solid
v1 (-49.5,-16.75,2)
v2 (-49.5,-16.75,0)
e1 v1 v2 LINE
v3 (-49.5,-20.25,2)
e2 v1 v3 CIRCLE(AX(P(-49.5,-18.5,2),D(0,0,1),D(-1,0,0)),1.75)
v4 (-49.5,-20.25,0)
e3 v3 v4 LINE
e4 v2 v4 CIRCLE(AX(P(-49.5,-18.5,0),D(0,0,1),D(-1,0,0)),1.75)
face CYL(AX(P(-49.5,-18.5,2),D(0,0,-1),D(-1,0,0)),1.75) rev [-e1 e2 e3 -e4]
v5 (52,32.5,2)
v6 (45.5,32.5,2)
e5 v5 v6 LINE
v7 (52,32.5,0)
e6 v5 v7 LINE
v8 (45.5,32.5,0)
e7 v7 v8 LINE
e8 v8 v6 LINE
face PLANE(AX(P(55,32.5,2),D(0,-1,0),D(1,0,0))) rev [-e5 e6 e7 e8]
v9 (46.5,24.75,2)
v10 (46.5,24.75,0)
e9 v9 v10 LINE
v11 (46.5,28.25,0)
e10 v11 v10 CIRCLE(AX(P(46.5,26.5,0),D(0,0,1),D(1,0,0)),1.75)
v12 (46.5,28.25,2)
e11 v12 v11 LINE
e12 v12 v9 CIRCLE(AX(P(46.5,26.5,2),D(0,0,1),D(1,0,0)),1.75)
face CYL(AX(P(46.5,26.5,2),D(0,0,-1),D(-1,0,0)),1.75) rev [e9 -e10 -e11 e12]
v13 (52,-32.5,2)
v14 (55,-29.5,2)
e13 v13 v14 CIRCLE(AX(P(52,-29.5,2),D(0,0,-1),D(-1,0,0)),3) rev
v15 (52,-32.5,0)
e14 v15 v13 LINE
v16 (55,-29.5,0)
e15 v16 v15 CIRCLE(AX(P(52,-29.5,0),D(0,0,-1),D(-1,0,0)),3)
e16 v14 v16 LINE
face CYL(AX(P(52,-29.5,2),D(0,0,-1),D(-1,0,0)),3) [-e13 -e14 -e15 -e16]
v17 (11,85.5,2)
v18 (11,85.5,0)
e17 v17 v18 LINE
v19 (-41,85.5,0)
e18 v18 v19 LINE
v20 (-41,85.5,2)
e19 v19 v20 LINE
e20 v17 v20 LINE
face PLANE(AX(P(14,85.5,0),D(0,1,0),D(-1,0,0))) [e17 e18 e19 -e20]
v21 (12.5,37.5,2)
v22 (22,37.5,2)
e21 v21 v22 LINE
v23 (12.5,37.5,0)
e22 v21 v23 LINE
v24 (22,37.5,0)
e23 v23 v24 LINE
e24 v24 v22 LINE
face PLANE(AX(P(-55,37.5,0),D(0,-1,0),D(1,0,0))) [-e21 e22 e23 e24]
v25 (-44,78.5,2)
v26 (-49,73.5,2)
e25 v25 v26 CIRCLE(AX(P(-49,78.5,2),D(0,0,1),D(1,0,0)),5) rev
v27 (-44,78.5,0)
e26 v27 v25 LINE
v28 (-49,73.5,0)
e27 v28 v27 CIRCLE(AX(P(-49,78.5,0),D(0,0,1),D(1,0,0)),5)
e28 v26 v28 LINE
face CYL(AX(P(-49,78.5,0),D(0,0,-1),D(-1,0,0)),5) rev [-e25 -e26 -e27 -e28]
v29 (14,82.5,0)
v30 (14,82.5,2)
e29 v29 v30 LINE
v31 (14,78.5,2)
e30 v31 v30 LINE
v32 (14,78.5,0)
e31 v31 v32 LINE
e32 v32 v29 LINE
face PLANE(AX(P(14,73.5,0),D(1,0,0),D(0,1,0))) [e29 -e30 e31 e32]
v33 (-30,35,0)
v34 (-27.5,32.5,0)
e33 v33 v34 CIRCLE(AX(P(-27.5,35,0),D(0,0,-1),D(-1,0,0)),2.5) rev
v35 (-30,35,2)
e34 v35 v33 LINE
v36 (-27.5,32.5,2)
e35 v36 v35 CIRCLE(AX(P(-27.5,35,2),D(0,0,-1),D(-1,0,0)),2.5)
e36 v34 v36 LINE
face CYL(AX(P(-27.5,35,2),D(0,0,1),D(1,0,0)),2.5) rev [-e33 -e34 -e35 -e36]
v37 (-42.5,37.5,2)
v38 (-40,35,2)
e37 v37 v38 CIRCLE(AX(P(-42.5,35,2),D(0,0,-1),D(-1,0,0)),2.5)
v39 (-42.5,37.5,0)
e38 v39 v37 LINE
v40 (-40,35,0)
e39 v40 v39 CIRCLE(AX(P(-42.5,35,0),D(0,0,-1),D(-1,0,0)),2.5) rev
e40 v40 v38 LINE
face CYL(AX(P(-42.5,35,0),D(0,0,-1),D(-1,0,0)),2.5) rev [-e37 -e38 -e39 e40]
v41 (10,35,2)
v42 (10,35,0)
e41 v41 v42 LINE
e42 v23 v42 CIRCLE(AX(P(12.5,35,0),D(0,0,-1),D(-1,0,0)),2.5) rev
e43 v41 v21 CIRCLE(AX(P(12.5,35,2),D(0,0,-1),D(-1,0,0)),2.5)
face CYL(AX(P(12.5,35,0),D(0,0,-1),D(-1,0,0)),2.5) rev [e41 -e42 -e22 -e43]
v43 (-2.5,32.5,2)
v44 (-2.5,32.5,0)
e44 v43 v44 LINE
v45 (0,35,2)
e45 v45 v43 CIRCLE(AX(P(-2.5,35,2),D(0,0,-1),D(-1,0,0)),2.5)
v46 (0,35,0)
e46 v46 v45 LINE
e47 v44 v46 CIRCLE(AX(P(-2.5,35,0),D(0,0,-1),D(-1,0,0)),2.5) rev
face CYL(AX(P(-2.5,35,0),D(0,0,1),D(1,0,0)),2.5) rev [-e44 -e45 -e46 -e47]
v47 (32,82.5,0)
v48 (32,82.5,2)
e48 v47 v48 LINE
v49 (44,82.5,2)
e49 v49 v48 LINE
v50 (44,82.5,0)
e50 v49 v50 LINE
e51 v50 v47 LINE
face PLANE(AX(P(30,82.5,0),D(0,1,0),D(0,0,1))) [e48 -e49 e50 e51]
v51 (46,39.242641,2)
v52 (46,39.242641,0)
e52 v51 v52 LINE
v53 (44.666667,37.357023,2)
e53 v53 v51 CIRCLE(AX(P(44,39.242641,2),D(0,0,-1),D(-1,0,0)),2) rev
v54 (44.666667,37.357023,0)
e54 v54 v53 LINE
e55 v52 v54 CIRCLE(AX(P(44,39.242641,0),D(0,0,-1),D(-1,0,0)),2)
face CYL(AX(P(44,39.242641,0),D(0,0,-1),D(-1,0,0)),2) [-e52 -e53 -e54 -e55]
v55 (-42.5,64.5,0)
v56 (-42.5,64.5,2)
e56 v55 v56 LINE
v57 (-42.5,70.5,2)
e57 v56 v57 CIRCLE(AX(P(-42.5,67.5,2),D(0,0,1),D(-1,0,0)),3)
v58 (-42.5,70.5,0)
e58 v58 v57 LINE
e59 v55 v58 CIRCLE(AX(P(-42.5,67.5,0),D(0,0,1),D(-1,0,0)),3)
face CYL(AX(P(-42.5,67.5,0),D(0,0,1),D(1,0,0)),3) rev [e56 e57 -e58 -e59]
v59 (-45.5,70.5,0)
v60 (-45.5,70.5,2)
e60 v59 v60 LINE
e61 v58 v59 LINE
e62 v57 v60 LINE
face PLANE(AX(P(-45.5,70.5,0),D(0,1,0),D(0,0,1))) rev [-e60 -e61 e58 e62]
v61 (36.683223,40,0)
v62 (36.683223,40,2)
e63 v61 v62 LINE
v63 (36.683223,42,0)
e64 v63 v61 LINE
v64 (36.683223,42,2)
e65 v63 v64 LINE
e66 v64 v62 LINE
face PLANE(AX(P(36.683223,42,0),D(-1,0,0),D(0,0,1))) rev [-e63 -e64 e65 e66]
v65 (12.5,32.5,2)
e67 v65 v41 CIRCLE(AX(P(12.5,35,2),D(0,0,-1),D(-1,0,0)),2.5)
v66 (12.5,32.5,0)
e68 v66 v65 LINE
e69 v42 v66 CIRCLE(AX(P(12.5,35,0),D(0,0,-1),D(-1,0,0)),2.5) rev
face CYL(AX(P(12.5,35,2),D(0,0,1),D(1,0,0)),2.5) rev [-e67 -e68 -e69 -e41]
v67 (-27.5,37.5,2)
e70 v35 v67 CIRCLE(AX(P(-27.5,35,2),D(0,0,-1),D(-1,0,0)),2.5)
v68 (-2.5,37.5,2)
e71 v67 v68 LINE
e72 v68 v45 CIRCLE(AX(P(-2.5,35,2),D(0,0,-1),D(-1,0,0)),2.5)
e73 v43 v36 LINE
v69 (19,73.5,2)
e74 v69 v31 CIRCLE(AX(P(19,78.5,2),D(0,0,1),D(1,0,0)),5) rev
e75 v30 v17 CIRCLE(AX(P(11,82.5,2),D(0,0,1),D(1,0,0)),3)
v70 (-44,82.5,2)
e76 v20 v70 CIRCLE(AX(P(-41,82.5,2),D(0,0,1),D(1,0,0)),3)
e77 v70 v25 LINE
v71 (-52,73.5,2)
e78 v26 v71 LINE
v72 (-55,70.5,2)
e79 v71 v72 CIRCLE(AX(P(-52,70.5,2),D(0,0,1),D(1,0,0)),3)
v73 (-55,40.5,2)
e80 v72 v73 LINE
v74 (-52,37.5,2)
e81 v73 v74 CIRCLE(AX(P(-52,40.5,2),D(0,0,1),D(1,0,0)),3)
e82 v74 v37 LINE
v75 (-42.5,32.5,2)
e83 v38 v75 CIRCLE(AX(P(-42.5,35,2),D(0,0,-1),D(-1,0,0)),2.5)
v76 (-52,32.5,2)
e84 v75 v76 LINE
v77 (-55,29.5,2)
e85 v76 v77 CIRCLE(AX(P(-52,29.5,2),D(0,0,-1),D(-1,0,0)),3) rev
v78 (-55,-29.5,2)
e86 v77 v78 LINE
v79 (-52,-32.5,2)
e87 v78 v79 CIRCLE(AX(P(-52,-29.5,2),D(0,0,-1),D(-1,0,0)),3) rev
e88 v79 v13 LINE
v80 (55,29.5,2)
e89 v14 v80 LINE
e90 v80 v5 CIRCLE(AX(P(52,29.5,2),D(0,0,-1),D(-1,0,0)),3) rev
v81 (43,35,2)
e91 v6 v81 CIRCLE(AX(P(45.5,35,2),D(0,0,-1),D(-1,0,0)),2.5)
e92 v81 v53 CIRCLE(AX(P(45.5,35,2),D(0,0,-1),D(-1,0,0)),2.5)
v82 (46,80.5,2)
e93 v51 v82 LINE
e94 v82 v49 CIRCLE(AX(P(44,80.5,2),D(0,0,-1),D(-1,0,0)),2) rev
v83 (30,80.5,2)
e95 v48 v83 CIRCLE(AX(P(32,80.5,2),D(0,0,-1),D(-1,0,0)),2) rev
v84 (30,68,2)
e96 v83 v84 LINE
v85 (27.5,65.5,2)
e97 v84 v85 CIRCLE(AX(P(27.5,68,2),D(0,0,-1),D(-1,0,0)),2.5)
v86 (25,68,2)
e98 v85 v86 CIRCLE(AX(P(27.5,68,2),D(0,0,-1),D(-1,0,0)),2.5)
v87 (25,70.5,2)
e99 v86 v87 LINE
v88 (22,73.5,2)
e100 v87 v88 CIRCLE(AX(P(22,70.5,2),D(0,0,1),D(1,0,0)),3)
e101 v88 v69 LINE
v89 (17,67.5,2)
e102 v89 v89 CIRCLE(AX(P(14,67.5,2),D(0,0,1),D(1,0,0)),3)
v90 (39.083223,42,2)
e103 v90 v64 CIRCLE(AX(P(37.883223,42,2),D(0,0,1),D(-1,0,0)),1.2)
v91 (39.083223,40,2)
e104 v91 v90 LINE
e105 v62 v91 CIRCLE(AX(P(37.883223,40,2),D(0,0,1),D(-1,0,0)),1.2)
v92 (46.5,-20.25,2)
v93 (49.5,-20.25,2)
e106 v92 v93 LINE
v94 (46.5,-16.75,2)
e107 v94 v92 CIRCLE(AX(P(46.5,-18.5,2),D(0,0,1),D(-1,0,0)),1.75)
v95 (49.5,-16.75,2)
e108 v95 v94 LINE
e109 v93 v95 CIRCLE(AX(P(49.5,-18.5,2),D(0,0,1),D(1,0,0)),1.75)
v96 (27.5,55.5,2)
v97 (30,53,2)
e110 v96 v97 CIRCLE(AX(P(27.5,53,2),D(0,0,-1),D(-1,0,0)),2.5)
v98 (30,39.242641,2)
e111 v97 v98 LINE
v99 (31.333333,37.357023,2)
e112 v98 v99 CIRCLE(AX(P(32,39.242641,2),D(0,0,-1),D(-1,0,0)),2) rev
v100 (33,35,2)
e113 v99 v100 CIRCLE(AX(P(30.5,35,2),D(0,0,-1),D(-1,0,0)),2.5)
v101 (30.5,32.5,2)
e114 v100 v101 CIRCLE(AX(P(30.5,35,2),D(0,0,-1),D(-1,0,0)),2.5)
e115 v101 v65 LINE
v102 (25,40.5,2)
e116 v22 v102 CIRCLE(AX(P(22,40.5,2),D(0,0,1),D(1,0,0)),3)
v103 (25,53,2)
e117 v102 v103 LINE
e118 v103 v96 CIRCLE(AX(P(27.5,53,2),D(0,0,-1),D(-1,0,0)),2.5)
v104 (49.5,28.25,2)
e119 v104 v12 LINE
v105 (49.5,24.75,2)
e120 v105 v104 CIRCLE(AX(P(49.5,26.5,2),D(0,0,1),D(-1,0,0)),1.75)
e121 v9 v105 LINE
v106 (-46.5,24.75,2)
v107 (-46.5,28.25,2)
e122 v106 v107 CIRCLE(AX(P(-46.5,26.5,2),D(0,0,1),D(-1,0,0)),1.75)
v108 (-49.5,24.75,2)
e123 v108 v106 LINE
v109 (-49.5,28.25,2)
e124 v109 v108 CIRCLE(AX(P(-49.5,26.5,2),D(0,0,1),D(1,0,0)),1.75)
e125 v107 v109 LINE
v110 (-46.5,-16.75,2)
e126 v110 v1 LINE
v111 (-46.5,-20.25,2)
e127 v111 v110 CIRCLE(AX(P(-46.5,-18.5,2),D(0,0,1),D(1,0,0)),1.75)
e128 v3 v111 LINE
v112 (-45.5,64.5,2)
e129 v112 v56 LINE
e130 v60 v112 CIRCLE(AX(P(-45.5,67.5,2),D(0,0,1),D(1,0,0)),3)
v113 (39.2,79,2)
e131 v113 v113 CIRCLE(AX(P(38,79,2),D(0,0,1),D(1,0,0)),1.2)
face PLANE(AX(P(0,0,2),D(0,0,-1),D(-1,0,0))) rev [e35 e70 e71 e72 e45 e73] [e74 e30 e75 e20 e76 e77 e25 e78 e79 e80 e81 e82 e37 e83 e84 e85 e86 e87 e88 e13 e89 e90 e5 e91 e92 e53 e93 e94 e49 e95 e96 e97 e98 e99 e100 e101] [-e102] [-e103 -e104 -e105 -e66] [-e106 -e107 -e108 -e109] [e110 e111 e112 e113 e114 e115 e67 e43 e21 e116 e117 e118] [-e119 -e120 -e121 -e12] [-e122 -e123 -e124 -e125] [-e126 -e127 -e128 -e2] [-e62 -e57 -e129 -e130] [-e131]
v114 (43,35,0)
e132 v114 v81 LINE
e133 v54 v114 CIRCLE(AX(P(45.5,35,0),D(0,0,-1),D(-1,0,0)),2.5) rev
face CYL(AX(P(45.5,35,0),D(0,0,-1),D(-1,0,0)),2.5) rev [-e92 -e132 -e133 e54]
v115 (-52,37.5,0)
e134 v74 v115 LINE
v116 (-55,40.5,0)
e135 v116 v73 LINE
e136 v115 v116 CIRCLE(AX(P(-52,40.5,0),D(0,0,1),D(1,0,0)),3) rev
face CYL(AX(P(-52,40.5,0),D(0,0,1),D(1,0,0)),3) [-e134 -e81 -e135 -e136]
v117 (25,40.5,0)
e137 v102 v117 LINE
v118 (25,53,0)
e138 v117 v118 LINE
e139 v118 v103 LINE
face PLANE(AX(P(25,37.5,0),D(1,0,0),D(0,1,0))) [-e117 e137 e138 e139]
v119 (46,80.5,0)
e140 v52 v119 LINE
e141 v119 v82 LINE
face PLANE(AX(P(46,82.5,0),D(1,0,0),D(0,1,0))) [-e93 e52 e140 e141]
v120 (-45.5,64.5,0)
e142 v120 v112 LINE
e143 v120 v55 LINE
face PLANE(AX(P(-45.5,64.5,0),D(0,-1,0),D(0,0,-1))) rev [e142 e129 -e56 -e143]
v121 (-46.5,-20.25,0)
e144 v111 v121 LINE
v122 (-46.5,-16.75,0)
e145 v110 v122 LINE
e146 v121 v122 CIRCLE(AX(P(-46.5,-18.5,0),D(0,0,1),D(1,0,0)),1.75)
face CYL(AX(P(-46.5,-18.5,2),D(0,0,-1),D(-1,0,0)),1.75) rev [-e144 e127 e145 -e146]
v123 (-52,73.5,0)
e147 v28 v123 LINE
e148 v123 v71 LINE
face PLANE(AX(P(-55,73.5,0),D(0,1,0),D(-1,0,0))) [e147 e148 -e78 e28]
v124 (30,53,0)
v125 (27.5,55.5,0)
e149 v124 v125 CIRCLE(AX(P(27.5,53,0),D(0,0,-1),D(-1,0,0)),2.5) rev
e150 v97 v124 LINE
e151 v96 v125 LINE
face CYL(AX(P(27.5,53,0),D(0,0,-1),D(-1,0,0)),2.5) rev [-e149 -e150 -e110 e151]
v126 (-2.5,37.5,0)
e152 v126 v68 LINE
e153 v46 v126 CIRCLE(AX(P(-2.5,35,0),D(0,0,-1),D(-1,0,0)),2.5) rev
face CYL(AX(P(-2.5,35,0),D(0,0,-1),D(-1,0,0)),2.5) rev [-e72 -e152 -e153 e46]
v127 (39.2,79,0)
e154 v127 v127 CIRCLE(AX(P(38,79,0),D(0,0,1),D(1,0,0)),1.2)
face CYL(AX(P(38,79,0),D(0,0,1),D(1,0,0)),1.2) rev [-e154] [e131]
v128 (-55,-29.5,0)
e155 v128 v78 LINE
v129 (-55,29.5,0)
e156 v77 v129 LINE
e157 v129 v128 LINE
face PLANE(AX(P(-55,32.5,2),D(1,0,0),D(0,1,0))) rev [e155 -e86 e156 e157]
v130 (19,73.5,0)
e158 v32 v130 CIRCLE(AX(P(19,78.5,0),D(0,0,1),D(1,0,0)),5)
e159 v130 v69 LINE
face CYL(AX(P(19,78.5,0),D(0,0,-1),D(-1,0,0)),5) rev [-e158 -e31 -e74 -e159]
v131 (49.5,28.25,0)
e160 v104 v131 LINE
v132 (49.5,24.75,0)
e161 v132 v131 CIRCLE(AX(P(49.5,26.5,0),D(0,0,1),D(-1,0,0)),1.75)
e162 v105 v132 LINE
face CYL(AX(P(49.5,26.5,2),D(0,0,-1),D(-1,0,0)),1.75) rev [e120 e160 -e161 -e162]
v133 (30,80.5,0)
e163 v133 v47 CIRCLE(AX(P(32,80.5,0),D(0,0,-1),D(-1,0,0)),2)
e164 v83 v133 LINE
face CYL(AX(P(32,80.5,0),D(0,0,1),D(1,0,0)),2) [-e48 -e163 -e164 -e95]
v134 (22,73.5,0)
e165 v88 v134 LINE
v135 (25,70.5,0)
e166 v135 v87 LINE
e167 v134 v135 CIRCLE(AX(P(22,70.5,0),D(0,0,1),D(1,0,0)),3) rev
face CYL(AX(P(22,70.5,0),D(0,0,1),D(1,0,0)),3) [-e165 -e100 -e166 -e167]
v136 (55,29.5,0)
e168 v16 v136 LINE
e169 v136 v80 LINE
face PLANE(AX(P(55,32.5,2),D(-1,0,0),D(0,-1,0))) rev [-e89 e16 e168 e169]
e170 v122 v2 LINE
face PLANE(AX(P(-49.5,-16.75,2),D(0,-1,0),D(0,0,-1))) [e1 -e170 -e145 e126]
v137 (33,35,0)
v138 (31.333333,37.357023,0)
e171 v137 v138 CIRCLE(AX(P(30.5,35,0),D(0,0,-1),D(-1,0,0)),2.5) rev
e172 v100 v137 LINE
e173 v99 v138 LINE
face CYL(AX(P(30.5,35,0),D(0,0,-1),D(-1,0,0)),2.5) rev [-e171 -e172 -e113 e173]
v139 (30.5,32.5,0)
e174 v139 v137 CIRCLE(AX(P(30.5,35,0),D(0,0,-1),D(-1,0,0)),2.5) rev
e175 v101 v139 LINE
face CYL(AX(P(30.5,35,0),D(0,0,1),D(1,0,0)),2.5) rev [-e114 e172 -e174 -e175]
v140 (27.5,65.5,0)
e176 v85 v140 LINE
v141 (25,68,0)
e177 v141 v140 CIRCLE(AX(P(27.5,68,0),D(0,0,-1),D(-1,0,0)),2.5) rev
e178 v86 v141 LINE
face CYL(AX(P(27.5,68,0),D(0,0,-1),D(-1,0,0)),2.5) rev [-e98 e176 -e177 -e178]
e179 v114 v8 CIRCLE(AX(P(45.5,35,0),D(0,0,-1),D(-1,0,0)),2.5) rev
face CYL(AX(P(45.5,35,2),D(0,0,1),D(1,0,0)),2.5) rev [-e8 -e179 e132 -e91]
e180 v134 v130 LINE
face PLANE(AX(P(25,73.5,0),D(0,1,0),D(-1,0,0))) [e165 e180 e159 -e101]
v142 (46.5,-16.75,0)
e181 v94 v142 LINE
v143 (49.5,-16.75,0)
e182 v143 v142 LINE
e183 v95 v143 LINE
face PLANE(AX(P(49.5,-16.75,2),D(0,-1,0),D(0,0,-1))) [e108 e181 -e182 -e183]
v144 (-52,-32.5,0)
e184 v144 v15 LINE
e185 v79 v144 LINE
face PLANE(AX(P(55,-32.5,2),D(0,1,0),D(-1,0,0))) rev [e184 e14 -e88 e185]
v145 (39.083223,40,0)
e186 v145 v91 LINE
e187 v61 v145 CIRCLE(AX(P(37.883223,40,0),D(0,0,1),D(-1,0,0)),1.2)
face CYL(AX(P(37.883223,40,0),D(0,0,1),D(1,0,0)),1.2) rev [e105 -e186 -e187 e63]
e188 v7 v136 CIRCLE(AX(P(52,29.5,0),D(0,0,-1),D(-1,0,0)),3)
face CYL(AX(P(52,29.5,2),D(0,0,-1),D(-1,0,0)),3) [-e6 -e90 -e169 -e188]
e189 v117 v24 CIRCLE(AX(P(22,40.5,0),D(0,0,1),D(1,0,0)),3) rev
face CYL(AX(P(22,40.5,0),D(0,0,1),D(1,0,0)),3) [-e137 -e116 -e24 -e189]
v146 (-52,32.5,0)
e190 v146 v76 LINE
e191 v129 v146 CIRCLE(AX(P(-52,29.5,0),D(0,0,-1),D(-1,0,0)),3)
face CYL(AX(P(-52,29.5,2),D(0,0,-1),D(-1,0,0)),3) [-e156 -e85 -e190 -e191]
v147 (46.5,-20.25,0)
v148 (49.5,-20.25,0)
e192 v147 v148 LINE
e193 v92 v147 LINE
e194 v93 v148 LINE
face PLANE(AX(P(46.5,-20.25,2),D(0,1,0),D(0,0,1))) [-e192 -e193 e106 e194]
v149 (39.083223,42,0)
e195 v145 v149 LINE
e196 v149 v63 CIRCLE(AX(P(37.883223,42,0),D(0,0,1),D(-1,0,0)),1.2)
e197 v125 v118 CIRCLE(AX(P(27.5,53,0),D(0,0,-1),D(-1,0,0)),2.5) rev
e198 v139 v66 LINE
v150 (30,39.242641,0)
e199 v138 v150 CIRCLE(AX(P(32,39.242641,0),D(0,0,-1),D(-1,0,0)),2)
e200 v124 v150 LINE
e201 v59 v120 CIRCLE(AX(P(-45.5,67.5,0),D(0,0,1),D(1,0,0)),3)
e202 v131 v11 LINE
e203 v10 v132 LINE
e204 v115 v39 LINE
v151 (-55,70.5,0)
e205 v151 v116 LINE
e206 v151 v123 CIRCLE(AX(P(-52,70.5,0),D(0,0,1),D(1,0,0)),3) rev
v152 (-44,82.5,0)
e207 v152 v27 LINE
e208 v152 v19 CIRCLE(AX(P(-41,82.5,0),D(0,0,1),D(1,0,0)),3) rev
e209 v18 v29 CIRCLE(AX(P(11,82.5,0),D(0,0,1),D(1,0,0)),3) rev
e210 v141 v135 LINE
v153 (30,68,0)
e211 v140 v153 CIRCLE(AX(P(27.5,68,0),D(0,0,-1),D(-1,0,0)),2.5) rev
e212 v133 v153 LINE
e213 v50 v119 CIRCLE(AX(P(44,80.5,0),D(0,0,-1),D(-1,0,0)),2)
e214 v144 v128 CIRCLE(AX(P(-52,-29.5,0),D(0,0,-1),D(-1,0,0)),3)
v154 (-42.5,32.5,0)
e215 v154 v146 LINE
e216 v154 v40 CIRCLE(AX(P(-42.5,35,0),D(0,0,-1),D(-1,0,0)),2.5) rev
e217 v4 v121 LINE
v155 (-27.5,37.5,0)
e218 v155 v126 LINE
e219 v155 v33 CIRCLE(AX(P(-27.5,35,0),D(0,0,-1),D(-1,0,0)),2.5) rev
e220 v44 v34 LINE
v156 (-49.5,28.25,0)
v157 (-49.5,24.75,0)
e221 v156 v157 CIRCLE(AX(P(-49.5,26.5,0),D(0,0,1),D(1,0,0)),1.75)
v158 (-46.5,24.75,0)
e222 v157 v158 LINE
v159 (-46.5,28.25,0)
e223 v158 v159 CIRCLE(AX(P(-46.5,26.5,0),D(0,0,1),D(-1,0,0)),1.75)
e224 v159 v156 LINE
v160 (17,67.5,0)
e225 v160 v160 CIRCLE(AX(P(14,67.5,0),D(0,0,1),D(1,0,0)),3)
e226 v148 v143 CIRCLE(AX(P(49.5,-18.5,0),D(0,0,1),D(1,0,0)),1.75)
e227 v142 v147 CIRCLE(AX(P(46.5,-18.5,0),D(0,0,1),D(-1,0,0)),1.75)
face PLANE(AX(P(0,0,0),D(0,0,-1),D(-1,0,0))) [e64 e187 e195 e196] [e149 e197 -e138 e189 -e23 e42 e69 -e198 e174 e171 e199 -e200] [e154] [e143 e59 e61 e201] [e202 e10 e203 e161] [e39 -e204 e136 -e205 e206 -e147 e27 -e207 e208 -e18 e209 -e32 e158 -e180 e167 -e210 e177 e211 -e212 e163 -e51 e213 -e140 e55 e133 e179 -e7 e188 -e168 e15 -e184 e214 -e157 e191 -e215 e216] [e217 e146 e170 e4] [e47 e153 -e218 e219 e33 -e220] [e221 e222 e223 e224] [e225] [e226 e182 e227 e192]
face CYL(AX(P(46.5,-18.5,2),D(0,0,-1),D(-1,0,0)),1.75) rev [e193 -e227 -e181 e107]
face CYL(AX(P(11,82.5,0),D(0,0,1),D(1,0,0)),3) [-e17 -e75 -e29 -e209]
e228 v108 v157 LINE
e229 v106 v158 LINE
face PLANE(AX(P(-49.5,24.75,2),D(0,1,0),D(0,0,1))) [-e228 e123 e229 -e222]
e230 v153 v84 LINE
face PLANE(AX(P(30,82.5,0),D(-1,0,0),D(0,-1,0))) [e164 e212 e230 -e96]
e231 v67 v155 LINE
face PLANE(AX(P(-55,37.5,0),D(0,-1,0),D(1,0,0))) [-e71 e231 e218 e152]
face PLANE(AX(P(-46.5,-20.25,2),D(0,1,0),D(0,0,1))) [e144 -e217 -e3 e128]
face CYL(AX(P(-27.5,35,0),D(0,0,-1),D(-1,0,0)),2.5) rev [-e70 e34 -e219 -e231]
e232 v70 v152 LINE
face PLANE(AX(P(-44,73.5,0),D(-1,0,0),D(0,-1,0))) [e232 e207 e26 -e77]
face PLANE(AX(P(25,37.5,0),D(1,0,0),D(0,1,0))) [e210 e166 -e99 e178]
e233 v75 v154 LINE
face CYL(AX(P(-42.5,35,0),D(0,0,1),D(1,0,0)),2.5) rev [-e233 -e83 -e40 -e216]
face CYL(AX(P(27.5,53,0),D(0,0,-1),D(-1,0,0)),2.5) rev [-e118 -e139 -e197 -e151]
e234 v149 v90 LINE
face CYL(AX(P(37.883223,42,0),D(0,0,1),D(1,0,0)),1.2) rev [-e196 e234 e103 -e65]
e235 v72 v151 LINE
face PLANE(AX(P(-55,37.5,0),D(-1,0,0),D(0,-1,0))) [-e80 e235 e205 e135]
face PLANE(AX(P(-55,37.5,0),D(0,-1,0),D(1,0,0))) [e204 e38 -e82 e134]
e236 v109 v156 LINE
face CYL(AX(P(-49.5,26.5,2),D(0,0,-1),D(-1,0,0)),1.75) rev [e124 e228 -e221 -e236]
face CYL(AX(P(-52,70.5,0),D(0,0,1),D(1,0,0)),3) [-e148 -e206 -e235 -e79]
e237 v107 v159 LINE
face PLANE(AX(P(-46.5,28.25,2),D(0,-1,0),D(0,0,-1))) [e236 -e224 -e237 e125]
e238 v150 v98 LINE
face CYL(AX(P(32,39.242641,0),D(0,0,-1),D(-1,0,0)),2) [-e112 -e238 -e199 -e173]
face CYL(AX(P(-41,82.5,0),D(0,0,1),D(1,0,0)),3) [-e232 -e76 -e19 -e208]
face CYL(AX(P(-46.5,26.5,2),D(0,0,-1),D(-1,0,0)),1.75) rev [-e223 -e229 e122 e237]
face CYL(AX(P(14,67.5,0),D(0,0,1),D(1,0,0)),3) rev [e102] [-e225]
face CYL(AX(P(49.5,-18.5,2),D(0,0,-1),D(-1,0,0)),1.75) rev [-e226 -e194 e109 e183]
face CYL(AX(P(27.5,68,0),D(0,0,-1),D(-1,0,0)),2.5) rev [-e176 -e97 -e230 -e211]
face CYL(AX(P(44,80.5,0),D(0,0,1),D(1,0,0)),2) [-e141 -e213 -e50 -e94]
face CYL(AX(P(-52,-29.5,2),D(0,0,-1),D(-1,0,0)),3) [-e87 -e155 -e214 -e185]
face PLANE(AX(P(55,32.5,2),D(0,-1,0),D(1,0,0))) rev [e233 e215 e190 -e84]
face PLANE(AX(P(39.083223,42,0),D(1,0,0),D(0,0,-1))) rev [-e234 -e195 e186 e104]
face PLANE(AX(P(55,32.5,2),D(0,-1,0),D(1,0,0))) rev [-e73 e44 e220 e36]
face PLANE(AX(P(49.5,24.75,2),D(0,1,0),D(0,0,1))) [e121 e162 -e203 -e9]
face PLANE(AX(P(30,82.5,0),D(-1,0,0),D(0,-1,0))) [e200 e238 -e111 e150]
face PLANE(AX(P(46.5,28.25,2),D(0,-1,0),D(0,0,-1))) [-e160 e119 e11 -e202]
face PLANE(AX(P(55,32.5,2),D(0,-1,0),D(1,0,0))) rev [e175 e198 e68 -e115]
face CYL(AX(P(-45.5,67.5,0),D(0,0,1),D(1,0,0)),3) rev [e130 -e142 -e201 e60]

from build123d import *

# Parameters (mm, degrees)
SKETCH_1_W      = 110
SKETCH_1_H      = 65
EXTRUDE_1_DEPTH = 2
FILLET_1_R      = 3
SKETCH_2_R      = 3
EXTRUDE_2_DEPTH = 2
FILLET_5_R      = 3
FILLET_6_R      = 5
SKETCH_4_W      = 10
SKETCH_4_H      = 5
EXTRUDE_4_DEPTH = 2
FILLET_7_R      = 2.5
SKETCH_5_W      = 16
SKETCH_5_H      = 45
SKETCH_5_R      = 1.2
EXTRUDE_5_DEPTH = 2
SKETCH_6_W      = 10
SKETCH_6_H      = 5
SKETCH_6_W_2    = 5
SKETCH_6_H_2    = 10
EXTRUDE_6_DEPTH = 2
FILLET_8_R      = 2.5
FILLET_9_R      = 2


with BuildPart() as part:
    # ｽｹｯﾁ1 → ﾎﾞｽ - 押し出し1 (new body)
    with BuildSketch(Plane.XY):
        Rectangle(SKETCH_1_W, SKETCH_1_H)
        with BuildLine():
            Line((-49.5, 24.75), (-46.5, 24.75))
            ThreePointArc((-46.5, 24.75), (-44.75, 26.5), (-46.5, 28.25))
            Line((-46.5, 28.25), (-49.5, 28.25))
            ThreePointArc((-49.5, 28.25), (-51.25, 26.5), (-49.5, 24.75))
        make_face(mode=Mode.SUBTRACT)
        with BuildLine():
            Line((-46.5, -20.25), (-49.5, -20.25))
            ThreePointArc((-49.5, -20.25), (-51.25, -18.5), (-49.5, -16.75))
            Line((-49.5, -16.75), (-46.5, -16.75))
            ThreePointArc((-46.5, -16.75), (-44.75, -18.5), (-46.5, -20.25))
        make_face(mode=Mode.SUBTRACT)
        with BuildLine():
            Line((46.5, -20.25), (49.5, -20.25))
            ThreePointArc((49.5, -20.25), (51.25, -18.5), (49.5, -16.75))
            Line((49.5, -16.75), (46.5, -16.75))
            ThreePointArc((46.5, -16.75), (44.75, -18.5), (46.5, -20.25))
        make_face(mode=Mode.SUBTRACT)
        with BuildLine():
            Line((46.5, 28.25), (49.5, 28.25))
            ThreePointArc((49.5, 28.25), (51.25, 26.5), (49.5, 24.75))
            Line((49.5, 24.75), (46.5, 24.75))
            ThreePointArc((46.5, 24.75), (44.75, 26.5), (46.5, 28.25))
        make_face(mode=Mode.SUBTRACT)
    extrude(amount=EXTRUDE_1_DEPTH)

    # ﾌｨﾚｯﾄ1
    fillet_1_edges = [part.edges().sort_by_distance(p)[0] for p in [
        (-55, 32.5, 1),
        (55, 32.5, 1),
        (55, -32.5, 1),
        (-55, -32.5, 1),
    ]]
    fillet(fillet_1_edges, radius=FILLET_1_R)



with BuildPart() as body_2:
    # ｽｹｯﾁ2 → ﾎﾞｽ - 押し出し2 (new body)
    with BuildSketch(Plane.XY.offset(2)):
        Polygon((-55, 37.5), (25, 37.5), (25, 73.5), (14, 73.5), (14, 85.5), (-44, 85.5), (-44, 73.5), (-55, 73.5), align=None)
        with Locations((14, 67.5)):
            Circle(SKETCH_2_R, mode=Mode.SUBTRACT)
        with BuildLine():
            Line((-45.5, 64.5), (-42.5, 64.5))
            ThreePointArc((-42.5, 64.5), (-39.5, 67.5), (-42.5, 70.5))
            Line((-42.5, 70.5), (-45.5, 70.5))
            ThreePointArc((-45.5, 70.5), (-48.5, 67.5), (-45.5, 64.5))
        make_face(mode=Mode.SUBTRACT)
    extrude(amount=-EXTRUDE_2_DEPTH)

    # ﾌｨﾚｯﾄ5
    fillet_5_edges = [body_2.edges().sort_by_distance(p)[0] for p in [
        (25, 37.5, 1),
        (-55, 37.5, 1),
        (-55, 73.5, 1),
        (-44, 85.5, 1),
        (14, 85.5, 1),
        (25, 73.5, 1),
    ]]
    fillet(fillet_5_edges, radius=FILLET_5_R)

    # ﾌｨﾚｯﾄ6
    fillet_6_edges = [body_2.edges().sort_by_distance(p)[0] for p in [
        (-44, 73.5, 1),
        (14, 73.5, 1),
    ]]
    fillet(fillet_6_edges, radius=FILLET_6_R)


with BuildPart() as part_1:
    add(part.part)

    add(body_2.part)  # ﾎﾞｽ - 押し出し4 merges body 2
    # ｽｹｯﾁ4 → ﾎﾞｽ - 押し出し4 (add)
    with BuildSketch(Plane.XY.offset(2)):
        with Locations((-35, 35)):
            Rectangle(SKETCH_4_W, SKETCH_4_H)
        with Locations((5, 35)):
            Rectangle(SKETCH_4_W, SKETCH_4_H)
    extrude(amount=-EXTRUDE_4_DEPTH)

    # ﾌｨﾚｯﾄ7
    fillet_7_edges = [part_1.edges().sort_by_distance(p)[0] for p in [
        (10, 37.5, 1),
        (10, 32.5, 1),
        (0, 37.5, 1),
        (0, 32.5, 1),
        (-30, 37.5, 1),
        (-30, 32.5, 1),
        (-40, 37.5, 1),
        (-40, 32.5, 1),
    ]]
    fillet(fillet_7_edges, radius=FILLET_7_R - 0.0001)  # a hair under: the kernel refuses the full size



with BuildPart() as body_2_2:
    # ｽｹｯﾁ5 → ﾎﾞｽ - 押し出し5 (new body)
    with BuildSketch(Plane.XY.offset(2)):
        with Locations((38, 60)):
            Rectangle(SKETCH_5_W, SKETCH_5_H)
        with Locations((38, 79)):
            Circle(SKETCH_5_R, mode=Mode.SUBTRACT)
        with BuildLine():
            Line((36.683223365, 42), (36.683223365, 40))
            ThreePointArc((36.683223365, 40), (37.883223365, 38.8), (39.083223365, 40))
            Line((39.083223365, 40), (39.083223365, 42))
            ThreePointArc((39.083223365, 42), (37.883223365, 43.2), (36.683223365, 42))
        make_face(mode=Mode.SUBTRACT)
    extrude(amount=-EXTRUDE_5_DEPTH)


with BuildPart() as part_2:
    add(part_1.part)

    add(body_2_2.part)  # ﾎﾞｽ - 押し出し6 merges body 2 2
    # ｽｹｯﾁ6 → ﾎﾞｽ - 押し出し6 (add)
    with BuildSketch(Plane.XY.offset(2)):
        with Locations((38, 35)):
            Rectangle(SKETCH_6_W, SKETCH_6_H)
        with Locations((27.5, 60.5)):
            Rectangle(SKETCH_6_W_2, SKETCH_6_H_2)
    extrude(amount=-EXTRUDE_6_DEPTH)

    # ﾌｨﾚｯﾄ8
    fillet_8_edges = [part_2.edges().sort_by_distance(p)[0] for p in [
        (43, 32.5, 1),
        (43, 37.5, 1),
        (33, 32.5, 1),
        (33, 37.5, 1),
        (30, 55.5, 1),
        (25, 55.5, 1),
        (25, 65.5, 1),
        (30, 65.5, 1),
    ]]
    fillet(fillet_8_edges, radius=FILLET_8_R - 0.0001)  # a hair under: the kernel refuses the full size

    # ﾌｨﾚｯﾄ9
    fillet_9_edges = [part_2.edges().sort_by_distance(p)[0] for p in [
        (46, 82.5, 1),
        (30, 82.5, 1),
        (46, 37.5, 1),
        (30, 37.5, 1),
    ]]
    fillet(fillet_9_edges, radius=FILLET_9_R)


solid = part_2.part
